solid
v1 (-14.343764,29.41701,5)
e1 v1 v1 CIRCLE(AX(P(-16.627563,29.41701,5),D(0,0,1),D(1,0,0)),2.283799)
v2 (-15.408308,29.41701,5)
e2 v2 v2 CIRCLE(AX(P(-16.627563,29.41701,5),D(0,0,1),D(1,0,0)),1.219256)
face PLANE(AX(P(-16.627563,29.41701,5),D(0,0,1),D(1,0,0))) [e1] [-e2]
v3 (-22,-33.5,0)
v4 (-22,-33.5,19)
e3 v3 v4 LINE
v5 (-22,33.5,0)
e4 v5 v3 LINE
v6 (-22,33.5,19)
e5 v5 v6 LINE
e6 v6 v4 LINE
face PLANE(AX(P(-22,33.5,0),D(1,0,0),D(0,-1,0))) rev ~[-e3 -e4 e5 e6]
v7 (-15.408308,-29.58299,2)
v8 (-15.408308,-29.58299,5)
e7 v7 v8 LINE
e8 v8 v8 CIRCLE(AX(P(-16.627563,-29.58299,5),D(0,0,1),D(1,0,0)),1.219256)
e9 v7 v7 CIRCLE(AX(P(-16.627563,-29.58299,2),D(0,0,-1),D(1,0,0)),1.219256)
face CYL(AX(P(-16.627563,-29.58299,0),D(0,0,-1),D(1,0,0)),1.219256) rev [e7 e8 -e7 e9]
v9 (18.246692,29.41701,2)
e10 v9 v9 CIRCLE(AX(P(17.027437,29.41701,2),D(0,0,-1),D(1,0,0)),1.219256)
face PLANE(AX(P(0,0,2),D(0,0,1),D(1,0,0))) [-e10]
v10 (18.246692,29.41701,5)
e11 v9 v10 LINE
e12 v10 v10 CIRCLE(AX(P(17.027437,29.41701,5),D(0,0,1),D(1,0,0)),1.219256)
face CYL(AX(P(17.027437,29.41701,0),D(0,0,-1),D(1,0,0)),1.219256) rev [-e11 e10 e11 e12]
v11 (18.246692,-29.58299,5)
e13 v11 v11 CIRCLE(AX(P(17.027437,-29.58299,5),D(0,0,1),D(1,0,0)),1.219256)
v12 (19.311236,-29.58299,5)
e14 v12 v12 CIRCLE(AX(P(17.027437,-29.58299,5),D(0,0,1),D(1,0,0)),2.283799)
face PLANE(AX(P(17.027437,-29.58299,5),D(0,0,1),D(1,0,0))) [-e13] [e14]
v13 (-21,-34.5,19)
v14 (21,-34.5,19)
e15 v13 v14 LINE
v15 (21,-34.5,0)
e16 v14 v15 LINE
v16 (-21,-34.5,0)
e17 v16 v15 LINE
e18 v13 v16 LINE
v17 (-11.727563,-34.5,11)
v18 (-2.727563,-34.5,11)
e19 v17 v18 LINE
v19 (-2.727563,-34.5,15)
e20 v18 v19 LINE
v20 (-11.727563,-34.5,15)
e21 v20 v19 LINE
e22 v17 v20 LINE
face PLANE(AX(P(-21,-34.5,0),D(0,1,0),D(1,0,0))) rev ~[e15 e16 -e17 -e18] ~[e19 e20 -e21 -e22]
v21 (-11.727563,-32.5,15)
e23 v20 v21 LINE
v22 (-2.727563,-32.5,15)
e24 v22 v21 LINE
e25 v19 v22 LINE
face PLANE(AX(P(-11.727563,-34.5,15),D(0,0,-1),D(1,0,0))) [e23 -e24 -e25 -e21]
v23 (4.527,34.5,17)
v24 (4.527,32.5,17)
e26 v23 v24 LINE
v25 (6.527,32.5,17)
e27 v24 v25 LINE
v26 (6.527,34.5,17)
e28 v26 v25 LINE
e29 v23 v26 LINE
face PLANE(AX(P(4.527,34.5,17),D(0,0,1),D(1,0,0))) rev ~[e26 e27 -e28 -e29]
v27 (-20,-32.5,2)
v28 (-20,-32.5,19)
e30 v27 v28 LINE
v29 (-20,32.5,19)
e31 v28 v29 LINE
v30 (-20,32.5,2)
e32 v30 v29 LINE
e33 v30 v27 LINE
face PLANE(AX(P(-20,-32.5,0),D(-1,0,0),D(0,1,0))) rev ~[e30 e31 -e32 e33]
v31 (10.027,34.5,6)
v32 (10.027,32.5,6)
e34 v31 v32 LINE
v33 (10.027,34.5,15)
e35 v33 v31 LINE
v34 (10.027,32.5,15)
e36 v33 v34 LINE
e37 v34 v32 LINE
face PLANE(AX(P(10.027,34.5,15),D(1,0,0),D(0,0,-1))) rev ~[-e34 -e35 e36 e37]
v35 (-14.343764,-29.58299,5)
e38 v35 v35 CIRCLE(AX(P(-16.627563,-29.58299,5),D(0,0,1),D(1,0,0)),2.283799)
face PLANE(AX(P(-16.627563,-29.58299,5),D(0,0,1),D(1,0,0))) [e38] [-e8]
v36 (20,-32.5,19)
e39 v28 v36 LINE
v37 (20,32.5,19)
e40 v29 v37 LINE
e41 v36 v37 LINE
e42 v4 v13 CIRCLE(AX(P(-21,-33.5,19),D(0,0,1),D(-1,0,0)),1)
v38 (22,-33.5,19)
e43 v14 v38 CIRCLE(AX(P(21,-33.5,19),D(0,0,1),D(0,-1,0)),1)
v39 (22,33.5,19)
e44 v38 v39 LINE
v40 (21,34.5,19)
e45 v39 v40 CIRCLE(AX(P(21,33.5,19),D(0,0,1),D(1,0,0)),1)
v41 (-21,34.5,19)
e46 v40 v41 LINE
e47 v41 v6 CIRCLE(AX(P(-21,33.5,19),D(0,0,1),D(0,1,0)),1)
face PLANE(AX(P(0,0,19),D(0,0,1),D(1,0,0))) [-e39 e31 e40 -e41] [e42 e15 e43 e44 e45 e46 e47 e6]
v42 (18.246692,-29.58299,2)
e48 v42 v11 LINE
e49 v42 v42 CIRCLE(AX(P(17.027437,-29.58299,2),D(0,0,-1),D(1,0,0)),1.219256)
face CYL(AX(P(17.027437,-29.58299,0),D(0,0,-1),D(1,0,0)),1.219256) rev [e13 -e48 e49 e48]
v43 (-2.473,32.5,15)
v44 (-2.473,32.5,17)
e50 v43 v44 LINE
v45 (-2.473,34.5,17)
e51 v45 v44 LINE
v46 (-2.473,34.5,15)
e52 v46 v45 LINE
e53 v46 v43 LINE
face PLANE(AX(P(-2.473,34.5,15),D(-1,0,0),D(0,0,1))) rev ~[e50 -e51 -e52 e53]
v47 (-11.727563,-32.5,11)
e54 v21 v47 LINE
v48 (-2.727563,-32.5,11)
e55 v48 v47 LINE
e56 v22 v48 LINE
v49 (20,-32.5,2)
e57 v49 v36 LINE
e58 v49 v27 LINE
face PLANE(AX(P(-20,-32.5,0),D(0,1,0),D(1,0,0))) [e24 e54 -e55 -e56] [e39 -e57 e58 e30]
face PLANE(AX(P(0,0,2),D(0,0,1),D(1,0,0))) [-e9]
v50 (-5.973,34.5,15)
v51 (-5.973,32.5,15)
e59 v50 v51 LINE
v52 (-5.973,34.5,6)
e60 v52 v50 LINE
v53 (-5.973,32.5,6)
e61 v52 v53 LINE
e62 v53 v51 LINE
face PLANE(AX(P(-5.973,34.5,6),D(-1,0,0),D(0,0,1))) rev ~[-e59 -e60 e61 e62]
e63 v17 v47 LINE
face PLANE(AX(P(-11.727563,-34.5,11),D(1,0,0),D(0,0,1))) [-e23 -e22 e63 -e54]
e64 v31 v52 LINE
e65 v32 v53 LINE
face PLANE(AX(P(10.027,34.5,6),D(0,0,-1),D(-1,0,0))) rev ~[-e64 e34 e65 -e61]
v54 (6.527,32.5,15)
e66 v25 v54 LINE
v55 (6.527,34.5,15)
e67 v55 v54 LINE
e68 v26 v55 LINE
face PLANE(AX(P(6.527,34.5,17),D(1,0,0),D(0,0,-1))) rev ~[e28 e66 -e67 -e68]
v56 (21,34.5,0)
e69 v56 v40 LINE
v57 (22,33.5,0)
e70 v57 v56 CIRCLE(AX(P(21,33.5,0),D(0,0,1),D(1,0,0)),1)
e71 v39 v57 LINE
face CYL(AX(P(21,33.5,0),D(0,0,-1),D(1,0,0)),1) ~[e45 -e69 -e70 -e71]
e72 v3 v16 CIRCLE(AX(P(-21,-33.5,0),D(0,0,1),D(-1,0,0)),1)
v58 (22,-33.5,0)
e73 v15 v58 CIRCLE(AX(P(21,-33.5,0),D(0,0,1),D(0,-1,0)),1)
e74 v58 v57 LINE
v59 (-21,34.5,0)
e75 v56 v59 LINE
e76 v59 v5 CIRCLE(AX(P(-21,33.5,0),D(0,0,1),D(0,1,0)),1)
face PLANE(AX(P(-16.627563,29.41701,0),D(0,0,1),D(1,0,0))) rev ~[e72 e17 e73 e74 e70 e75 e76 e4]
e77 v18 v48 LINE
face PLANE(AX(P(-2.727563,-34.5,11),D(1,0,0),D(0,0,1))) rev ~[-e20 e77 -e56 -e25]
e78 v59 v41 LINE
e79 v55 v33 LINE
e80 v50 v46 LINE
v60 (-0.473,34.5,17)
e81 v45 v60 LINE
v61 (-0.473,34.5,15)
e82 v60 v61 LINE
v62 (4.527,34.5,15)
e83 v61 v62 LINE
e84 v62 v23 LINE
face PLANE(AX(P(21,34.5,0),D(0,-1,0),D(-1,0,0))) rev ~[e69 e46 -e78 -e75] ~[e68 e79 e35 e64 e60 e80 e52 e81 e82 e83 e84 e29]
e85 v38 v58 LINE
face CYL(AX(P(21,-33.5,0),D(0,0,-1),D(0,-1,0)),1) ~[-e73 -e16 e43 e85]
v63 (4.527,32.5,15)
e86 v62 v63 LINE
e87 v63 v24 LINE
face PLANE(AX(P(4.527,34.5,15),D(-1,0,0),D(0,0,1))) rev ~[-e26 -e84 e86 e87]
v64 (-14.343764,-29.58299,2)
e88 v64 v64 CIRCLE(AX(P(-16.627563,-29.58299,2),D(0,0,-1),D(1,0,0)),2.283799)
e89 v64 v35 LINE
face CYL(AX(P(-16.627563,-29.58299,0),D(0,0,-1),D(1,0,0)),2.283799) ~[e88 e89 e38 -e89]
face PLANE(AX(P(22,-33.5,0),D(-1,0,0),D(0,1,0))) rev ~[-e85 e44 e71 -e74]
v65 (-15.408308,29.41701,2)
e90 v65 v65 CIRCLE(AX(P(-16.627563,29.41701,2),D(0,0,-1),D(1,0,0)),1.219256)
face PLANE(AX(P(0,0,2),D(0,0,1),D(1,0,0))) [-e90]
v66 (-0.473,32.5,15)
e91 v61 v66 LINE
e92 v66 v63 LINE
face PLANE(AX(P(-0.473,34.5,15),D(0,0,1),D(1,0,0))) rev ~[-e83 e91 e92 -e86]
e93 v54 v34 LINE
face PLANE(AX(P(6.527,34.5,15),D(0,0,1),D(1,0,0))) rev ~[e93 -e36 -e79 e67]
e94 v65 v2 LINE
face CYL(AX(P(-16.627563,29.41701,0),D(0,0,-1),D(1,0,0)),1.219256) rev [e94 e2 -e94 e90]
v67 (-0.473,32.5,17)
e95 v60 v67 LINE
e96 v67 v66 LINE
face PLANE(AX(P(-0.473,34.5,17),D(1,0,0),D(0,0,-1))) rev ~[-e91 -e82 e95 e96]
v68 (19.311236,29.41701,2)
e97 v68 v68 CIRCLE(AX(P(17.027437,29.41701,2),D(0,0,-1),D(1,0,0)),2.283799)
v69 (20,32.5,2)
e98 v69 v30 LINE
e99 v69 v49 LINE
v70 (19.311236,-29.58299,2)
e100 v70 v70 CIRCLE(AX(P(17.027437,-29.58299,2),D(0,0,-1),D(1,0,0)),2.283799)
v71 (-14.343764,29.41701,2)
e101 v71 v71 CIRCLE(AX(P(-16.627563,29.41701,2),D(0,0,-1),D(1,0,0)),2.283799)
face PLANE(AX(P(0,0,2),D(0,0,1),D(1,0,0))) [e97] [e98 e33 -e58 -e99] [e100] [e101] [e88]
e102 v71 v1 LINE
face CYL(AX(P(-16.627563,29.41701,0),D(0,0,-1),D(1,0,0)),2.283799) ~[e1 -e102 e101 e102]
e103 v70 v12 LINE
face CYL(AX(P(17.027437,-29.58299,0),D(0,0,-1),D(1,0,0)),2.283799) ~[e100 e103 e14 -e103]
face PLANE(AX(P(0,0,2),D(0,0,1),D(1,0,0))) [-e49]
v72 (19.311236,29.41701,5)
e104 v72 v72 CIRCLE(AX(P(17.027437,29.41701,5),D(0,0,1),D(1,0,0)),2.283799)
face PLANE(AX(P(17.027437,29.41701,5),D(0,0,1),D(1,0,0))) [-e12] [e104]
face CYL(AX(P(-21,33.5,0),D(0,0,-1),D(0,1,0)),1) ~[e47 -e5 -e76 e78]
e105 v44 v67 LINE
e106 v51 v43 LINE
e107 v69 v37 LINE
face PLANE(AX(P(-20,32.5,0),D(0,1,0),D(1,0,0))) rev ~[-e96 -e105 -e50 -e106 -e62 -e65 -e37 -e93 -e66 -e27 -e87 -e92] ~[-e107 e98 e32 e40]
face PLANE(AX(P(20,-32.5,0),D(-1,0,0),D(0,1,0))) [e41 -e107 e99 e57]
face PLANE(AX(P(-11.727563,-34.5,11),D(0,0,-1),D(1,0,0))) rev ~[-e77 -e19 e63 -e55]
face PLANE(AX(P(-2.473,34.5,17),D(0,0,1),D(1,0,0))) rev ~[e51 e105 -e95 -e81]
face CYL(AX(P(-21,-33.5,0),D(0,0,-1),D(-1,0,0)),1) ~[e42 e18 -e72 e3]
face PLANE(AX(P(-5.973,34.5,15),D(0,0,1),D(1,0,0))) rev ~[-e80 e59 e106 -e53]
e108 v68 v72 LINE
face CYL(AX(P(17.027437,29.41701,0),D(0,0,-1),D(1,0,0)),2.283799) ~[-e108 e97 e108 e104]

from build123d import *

# Parameters (mm, degrees)
F0_W     = 40
F0_H     = 65
F0_R     = 2.2837988166
F0_R_2   = 1.2192556023
F1_DEPTH = 2
F2_DEPTH = 19
F3_DEPTH = 5
F5_DEPTH = 5
F6_W     = 9
F6_H     = 4
F7_DEPTH = 5


with BuildPart() as f1:
    # F0 (on Top) → F1 (new body)
    with BuildSketch(Plane.XY):
        with BuildLine():
            ThreePointArc((22, 33.5), (21.7071067812, 34.2071067812), (21, 34.5))
            Line((21, 34.5), (-21, 34.5))
            ThreePointArc((-21, 34.5), (-21.7071067812, 34.2071067812), (-22, 33.5))
            Line((-22, 33.5), (-22, -33.5))
            ThreePointArc((-22, -33.5), (-21.7071067812, -34.2071067812), (-21, -34.5))
            Line((-21, -34.5), (21, -34.5))
            ThreePointArc((21, -34.5), (21.7071067812, -34.2071067812), (22, -33.5))
            Line((22, -33.5), (22, 33.5))
        make_face()
        Rectangle(F0_W, F0_H, mode=Mode.SUBTRACT)
        Rectangle(F0_W, F0_H)
        with Locations((-16.6275631636, -29.5829899758)):
            Circle(F0_R, mode=Mode.SUBTRACT)
        with Locations((17.0274368364, -29.5829899758)):
            Circle(F0_R, mode=Mode.SUBTRACT)
        with Locations((-16.6275631636, 29.4170100242)):
            Circle(F0_R, mode=Mode.SUBTRACT)
        with Locations((17.0274368364, 29.4170100242)):
            Circle(F0_R, mode=Mode.SUBTRACT)
        with Locations((17.0274368364, -29.5829899758)):
            Circle(F0_R)
        with Locations((17.0274368364, -29.5829899758)):
            Circle(F0_R_2, mode=Mode.SUBTRACT)
        with Locations((-16.6275631636, -29.5829899758)):
            Circle(F0_R)
        with Locations((-16.6275631636, -29.5829899758)):
            Circle(F0_R_2, mode=Mode.SUBTRACT)
        with Locations((17.0274368364, 29.4170100242)):
            Circle(F0_R)
        with Locations((17.0274368364, 29.4170100242)):
            Circle(F0_R_2, mode=Mode.SUBTRACT)
        with Locations((-16.6275631636, 29.4170100242)):
            Circle(F0_R)
        with Locations((-16.6275631636, 29.4170100242)):
            Circle(F0_R_2, mode=Mode.SUBTRACT)
        with Locations((-16.6275631636, -29.5829899758)):
            Circle(F0_R_2)
        with Locations((17.0274368364, -29.5829899758)):
            Circle(F0_R_2)
        with Locations((17.0274368364, 29.4170100242)):
            Circle(F0_R_2)
        with Locations((-16.6275631636, 29.4170100242)):
            Circle(F0_R_2)
    extrude(amount=F1_DEPTH)

    # F0 (on Top) → F2 (join)
    with BuildSketch(Plane.XY):
        with BuildLine():
            ThreePointArc((22, 33.5), (21.7071067812, 34.2071067812), (21, 34.5))
            Line((21, 34.5), (-21, 34.5))
            ThreePointArc((-21, 34.5), (-21.7071067812, 34.2071067812), (-22, 33.5))
            Line((-22, 33.5), (-22, -33.5))
            ThreePointArc((-22, -33.5), (-21.7071067812, -34.2071067812), (-21, -34.5))
            Line((-21, -34.5), (21, -34.5))
            ThreePointArc((21, -34.5), (21.7071067812, -34.2071067812), (22, -33.5))
            Line((22, -33.5), (22, 33.5))
        make_face()
        Rectangle(F0_W, F0_H, mode=Mode.SUBTRACT)
    extrude(amount=F2_DEPTH)

    # F0 (on Top) → F3 (join)
    with BuildSketch(Plane.XY):
        with Locations((-16.6275631636, 29.4170100242)):
            Circle(F0_R)
        with Locations((-16.6275631636, 29.4170100242)):
            Circle(F0_R_2, mode=Mode.SUBTRACT)
        with Locations((17.0274368364, 29.4170100242)):
            Circle(F0_R)
        with Locations((17.0274368364, 29.4170100242)):
            Circle(F0_R_2, mode=Mode.SUBTRACT)
        with Locations((-16.6275631636, -29.5829899758)):
            Circle(F0_R)
        with Locations((-16.6275631636, -29.5829899758)):
            Circle(F0_R_2, mode=Mode.SUBTRACT)
        with Locations((17.0274368364, -29.5829899758)):
            Circle(F0_R)
        with Locations((17.0274368364, -29.5829899758)):
            Circle(F0_R_2, mode=Mode.SUBTRACT)
    extrude(amount=F3_DEPTH)

    # F4 (on face) → F5 (cut)
    with BuildSketch(Plane(origin=(0, 34.5, 0), x_dir=(-1, 0, 0), z_dir=(0, 1, 0))):
        Polygon((-10.027, 6), (5.973, 6), (5.973, 15), (2.473, 15), (2.473, 17), (0.473, 17), (0.473, 15), (-4.527, 15), (-4.527, 17), (-6.527, 17), (-6.527, 15), (-10.027, 15), align=None)
    extrude(amount=-F5_DEPTH, mode=Mode.SUBTRACT)

    # F6 (on face) → F7 (cut)
    with BuildSketch(Plane.XZ.offset(34.5)):
        with Locations((-7.2275631636, 13)):
            Rectangle(F6_W, F6_H)
    extrude(amount=-F7_DEPTH, mode=Mode.SUBTRACT)


solid = f1.part
